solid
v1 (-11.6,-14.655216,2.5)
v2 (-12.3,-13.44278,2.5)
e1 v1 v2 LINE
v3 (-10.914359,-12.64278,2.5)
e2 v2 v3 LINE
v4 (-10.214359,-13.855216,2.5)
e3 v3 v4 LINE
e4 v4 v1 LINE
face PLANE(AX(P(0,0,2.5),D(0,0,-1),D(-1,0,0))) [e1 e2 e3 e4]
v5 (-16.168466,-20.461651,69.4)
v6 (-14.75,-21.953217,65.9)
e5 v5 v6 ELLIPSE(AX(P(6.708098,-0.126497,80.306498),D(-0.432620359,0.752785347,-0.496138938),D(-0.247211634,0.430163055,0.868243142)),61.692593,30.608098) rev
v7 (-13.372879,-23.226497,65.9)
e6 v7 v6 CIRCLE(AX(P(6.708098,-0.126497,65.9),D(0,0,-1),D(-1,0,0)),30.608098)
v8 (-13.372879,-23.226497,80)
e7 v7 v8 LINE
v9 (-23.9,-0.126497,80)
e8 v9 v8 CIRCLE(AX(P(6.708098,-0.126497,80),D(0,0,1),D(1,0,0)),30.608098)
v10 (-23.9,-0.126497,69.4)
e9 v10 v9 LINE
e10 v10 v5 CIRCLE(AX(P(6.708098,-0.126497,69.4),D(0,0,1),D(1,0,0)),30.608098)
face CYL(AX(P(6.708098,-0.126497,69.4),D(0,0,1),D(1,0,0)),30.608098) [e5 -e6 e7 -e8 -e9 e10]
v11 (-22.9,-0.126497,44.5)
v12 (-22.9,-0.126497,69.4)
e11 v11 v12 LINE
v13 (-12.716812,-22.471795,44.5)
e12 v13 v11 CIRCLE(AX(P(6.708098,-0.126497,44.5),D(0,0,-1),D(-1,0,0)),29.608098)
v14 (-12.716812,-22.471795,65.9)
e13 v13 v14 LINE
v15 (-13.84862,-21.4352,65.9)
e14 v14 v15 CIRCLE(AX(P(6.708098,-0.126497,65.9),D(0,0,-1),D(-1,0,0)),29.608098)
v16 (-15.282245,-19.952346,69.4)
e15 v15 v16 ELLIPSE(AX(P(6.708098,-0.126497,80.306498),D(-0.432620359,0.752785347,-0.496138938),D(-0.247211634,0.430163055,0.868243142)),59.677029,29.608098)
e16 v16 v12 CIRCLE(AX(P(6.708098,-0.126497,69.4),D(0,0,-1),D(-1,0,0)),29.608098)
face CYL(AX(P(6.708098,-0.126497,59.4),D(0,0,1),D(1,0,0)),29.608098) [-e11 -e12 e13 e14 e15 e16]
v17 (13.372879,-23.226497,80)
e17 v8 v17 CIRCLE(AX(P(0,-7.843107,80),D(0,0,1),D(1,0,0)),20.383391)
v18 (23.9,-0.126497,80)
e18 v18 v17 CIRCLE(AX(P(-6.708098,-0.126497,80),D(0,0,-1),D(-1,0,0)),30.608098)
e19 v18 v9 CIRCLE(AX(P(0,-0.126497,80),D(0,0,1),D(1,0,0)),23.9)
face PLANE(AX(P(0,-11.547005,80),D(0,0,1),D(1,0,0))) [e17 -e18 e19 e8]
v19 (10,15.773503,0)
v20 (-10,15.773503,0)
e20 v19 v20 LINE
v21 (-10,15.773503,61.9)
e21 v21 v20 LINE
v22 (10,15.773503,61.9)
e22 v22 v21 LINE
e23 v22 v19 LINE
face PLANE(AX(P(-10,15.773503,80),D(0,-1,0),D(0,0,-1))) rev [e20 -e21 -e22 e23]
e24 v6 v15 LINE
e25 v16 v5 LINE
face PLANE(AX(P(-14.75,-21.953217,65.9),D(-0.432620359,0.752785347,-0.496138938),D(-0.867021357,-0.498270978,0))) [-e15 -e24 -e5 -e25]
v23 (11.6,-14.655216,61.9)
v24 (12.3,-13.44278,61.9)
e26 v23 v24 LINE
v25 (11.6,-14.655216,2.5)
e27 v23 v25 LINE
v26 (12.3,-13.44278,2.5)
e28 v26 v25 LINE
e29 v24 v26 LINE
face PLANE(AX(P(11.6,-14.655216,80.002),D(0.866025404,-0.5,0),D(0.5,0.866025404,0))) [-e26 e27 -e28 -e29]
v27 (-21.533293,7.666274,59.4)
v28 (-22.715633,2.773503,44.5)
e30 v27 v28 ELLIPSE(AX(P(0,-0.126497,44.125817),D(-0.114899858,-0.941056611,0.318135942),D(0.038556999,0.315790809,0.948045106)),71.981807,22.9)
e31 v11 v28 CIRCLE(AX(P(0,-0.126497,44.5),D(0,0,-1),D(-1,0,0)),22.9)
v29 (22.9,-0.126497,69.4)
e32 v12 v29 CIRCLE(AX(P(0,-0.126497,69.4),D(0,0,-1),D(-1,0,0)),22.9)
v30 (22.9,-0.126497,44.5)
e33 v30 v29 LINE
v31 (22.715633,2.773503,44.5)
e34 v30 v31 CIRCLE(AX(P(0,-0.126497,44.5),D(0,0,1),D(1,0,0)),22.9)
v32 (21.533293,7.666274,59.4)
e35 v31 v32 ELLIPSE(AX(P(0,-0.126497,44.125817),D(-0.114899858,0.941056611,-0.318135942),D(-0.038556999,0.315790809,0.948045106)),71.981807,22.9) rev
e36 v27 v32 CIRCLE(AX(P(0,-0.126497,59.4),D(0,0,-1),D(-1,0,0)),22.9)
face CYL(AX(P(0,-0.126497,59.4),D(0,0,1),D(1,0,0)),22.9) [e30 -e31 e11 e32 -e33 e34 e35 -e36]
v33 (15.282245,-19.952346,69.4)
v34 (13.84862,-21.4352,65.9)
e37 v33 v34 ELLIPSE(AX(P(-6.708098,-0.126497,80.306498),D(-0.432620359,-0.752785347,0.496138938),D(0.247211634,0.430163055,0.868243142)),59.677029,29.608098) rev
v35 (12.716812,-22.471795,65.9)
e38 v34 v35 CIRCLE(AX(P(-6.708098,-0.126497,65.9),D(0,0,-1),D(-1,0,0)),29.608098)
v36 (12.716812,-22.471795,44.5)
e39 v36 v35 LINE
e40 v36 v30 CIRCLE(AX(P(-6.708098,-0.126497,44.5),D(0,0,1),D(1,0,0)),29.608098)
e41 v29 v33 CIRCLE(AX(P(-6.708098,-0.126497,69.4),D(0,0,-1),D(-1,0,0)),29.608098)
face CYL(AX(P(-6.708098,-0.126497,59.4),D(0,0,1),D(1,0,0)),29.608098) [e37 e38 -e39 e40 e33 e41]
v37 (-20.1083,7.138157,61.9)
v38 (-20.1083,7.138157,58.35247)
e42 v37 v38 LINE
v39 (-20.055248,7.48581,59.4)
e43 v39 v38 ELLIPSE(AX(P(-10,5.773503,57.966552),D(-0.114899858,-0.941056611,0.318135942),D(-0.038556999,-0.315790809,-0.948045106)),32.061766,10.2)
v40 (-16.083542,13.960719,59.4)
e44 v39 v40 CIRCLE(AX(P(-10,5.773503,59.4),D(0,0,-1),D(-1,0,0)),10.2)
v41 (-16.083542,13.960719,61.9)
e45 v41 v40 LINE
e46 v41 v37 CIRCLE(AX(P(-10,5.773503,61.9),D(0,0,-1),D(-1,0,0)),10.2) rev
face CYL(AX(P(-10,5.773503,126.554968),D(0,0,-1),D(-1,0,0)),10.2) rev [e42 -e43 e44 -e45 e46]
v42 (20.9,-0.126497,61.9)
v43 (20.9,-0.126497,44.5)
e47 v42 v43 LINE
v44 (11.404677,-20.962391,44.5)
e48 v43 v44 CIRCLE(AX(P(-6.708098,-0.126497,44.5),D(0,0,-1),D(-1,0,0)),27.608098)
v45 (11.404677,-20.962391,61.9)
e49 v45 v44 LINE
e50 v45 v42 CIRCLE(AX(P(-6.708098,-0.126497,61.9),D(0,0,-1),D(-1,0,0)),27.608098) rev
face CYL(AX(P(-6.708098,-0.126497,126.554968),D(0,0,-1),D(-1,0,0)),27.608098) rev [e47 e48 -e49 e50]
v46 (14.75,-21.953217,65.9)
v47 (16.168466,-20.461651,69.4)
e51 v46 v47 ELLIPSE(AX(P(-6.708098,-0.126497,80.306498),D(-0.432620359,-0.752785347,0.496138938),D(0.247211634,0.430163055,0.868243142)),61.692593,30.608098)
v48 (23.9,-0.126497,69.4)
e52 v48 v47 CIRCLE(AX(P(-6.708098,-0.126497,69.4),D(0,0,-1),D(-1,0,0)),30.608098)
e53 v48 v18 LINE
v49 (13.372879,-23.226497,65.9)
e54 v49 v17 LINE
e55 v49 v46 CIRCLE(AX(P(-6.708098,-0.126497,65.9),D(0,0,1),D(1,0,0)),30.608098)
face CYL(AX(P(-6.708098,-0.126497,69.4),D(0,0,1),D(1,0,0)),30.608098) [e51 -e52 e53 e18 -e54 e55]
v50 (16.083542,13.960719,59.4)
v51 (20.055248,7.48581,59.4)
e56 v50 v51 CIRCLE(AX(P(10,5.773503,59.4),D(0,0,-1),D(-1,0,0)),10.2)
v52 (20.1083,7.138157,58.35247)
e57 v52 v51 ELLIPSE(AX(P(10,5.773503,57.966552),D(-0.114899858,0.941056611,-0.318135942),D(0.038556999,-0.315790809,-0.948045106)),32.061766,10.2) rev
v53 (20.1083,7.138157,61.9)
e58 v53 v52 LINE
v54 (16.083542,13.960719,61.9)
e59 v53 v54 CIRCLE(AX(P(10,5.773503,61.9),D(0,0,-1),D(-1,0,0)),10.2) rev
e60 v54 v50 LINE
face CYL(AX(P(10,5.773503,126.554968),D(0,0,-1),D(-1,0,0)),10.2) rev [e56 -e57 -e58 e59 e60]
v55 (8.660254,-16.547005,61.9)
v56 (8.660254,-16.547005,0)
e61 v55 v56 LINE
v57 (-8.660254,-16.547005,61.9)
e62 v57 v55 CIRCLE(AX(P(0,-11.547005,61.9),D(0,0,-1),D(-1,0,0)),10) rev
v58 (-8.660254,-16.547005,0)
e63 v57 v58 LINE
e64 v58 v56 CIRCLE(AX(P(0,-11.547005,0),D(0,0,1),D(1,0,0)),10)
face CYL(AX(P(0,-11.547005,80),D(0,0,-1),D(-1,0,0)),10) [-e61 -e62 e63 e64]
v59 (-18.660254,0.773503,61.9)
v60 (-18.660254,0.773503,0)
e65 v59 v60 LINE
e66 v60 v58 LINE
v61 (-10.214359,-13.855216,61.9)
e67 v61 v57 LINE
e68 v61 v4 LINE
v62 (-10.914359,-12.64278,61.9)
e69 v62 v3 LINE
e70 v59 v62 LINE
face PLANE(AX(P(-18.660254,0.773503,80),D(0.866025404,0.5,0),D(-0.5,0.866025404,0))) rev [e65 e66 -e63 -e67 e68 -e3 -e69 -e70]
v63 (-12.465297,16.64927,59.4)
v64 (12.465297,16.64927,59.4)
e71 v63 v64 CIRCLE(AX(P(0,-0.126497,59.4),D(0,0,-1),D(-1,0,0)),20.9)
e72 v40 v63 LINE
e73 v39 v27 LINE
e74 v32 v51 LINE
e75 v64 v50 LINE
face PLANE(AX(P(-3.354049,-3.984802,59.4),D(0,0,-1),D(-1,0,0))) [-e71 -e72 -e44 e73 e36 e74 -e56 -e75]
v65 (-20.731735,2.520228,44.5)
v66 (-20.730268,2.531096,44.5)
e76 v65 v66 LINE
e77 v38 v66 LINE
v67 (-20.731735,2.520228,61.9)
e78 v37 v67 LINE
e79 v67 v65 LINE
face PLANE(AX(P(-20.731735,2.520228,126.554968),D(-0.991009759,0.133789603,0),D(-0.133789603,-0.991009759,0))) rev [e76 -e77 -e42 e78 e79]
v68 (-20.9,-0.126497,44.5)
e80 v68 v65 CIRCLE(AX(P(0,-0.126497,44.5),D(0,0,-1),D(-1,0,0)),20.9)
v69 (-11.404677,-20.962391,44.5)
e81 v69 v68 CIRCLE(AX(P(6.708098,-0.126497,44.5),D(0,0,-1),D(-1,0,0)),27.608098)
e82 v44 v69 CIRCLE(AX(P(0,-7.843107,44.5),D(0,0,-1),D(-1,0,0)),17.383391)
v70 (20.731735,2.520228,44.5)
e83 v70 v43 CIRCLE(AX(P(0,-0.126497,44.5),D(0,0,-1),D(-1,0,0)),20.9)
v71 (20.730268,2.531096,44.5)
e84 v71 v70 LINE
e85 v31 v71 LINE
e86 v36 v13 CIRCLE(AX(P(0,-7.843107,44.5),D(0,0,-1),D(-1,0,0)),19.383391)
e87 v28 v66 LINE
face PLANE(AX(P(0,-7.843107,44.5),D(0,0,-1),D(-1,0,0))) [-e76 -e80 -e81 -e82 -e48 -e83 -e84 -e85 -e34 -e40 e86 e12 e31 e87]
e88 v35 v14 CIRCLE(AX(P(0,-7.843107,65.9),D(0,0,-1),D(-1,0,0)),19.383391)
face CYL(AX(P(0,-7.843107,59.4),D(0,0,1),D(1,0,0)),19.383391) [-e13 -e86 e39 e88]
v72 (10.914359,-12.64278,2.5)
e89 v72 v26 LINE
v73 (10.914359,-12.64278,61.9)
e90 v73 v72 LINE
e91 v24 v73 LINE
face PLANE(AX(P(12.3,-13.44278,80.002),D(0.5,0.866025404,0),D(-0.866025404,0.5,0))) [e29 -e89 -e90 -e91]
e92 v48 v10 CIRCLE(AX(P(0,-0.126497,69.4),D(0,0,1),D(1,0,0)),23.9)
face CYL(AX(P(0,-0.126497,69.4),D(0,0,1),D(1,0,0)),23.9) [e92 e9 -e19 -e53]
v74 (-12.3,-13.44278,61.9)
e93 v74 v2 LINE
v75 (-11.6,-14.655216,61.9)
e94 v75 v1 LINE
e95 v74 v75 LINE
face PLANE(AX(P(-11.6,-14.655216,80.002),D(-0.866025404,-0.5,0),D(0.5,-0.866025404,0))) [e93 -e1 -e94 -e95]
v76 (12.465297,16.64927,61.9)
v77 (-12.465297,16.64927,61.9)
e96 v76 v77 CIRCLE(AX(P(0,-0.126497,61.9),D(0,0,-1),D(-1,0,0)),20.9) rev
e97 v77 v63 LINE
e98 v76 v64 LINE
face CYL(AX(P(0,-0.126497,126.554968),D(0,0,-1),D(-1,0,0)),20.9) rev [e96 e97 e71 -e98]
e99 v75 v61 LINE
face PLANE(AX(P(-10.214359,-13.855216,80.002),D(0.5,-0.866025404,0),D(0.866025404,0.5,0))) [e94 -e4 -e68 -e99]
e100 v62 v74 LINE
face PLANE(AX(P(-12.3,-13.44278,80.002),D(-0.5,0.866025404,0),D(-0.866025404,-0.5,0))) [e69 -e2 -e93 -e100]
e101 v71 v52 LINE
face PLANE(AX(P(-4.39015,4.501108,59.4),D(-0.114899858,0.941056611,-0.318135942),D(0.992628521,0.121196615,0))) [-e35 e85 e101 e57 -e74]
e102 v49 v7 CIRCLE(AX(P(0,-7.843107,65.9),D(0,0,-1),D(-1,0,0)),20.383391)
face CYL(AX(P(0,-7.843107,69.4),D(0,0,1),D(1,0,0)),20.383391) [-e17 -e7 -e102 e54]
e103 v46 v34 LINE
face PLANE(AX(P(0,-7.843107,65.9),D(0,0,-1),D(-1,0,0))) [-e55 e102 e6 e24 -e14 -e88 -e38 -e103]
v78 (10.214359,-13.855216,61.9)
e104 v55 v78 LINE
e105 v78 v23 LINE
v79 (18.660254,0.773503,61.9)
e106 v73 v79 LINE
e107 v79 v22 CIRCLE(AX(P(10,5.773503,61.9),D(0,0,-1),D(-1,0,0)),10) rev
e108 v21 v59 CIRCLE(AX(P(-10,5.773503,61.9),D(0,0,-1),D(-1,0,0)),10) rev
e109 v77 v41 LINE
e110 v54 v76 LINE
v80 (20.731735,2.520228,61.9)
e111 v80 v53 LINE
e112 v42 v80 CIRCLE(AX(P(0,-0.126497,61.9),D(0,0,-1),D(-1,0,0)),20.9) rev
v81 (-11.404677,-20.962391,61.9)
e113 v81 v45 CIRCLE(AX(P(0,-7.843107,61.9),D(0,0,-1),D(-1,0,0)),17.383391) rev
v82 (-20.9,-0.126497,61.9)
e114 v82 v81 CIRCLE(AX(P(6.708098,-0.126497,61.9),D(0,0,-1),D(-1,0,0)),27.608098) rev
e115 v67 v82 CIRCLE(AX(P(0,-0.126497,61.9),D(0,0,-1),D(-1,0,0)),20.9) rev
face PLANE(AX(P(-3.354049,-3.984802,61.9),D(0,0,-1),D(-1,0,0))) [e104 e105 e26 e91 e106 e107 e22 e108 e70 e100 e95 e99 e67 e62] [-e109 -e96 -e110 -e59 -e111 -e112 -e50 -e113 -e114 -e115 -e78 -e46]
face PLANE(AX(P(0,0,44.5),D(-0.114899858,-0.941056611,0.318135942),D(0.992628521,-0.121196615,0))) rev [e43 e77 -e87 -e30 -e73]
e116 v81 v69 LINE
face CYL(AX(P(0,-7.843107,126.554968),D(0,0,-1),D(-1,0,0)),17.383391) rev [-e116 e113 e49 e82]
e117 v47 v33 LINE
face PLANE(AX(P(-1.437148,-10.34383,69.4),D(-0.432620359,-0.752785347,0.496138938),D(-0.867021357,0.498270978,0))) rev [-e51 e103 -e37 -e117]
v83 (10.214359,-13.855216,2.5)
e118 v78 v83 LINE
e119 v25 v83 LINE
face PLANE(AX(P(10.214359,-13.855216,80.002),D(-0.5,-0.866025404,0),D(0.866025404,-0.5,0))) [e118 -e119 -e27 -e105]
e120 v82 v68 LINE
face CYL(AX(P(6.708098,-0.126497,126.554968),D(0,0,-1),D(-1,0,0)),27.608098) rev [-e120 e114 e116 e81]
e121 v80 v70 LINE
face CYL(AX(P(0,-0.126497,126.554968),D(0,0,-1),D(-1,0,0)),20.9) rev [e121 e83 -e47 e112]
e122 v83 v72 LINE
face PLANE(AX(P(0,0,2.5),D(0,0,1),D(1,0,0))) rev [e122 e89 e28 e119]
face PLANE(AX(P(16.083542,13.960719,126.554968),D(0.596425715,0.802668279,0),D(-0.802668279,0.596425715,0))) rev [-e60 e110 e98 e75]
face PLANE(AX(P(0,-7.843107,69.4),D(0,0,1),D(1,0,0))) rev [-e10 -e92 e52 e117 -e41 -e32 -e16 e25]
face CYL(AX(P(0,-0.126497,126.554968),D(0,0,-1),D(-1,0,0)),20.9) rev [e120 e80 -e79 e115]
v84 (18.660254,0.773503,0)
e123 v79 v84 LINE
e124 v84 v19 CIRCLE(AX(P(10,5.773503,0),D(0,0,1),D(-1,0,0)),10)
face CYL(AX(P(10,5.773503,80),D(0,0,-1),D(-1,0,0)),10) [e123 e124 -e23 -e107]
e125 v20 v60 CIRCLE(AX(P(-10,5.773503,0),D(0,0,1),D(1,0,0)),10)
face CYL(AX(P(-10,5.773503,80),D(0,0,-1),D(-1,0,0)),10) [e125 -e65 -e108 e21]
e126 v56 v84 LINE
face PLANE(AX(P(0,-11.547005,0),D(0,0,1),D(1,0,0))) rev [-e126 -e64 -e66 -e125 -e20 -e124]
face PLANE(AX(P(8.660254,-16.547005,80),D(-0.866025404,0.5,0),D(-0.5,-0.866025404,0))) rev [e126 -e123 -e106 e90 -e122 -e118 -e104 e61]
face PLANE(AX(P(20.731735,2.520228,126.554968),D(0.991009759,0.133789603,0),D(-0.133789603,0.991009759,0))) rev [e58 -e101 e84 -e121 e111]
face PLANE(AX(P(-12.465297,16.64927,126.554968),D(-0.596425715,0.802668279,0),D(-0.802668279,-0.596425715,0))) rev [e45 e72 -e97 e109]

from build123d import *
from OCP.BRepFilletAPI import BRepFilletAPI_MakeChamfer

# Parameters (mm, degrees)
BOSS_EXTRU_1_DEPTH      = 80
BOSS_EXTRU_2_DEPTH      = 10.6
BOSS_EXTRU_3_DEPTH      = 10
BOSS_EXTRU_4_DEPTH      = 3.5
CHANFREIN1_SIZE         = 2
CHANFREIN1_SIZE_2       = 3.5
BOSS_EXTRU_5_DEPTH      = 14.9
CHANFREIN2_SIZE         = 5
CHANFREIN2_SIZE_2       = 14.9
ENL_V_MAT_EXTRU_1_DEPTH = 61.9
BOSS_EXTRU_8_REACH      = 92.636
BOSS_EXTRU_8_START      = -2.5


with BuildPart() as part:
    # Esquisse1 → Boss.-Extru.1 (new body)
    with BuildSketch(Plane.XY):
        with BuildLine():
            Line((-9.999999999999973, 15.773502691896244), (9.999999999999973, 15.773502691896244))
            ThreePointArc((9.999999999999973, 15.773502691896244), (18.66025403784436, 10.773502691896228), (18.66025403784438, 0.7735026918962024))
            Line((18.66025403784438, 0.7735026918962024), (8.660254037844393, -16.54700538379251))
            ThreePointArc((8.660254037844393, -16.54700538379251), (-4.87e-15, -21.5470053837925), (-8.660254037844393, -16.54700538379251))
            Line((-8.660254037844393, -16.54700538379251), (-18.66025403784438, 0.7735026918962024))
            ThreePointArc((-18.66025403784438, 0.7735026918962024), (-18.66025403784441, 10.773502691896235), (-9.999999999999973, 15.773502691896244))
        make_face()
    extrude(amount=BOSS_EXTRU_1_DEPTH)

    # Esquisse2 → Boss.-Extru.2 (add)
    with BuildSketch(Plane.XY.offset(80)):
        with BuildLine():
            Line((0, 23.773502691896258), (0, -28.226497308103742))
            ThreePointArc((0, -28.226497308103742), (-7.138520611844601, -26.935621886911633), (-13.372879499304581, -23.22649730810374))
            ThreePointArc((-13.372879499304581, -23.22649730810374), (-21.14415675858487, -12.819312855059437), (-23.89999999999999, -0.12649730810374363))
            ThreePointArc((-23.89999999999999, -0.12649730810374363), (-16.89985207035848, 16.773354762254744), (0, 23.773502691896258))
        make_face()
    boss_extru_2 = extrude(amount=-BOSS_EXTRU_2_DEPTH)

    # Symétrie1: Boss.-Extru.2 across plane
    add(boss_extru_2.mirror(Plane(origin=(0, 0, 0), x_dir=(0, 0, 1), z_dir=(1, 0, 0))))

    # Esquisse4 → Boss.-Extru.3 (add)
    with BuildSketch(Plane(origin=(0, 0, 69.4), x_dir=(-1, 0, 0), z_dir=(0, 0, -1))):
        with BuildLine():
            ThreePointArc((-12.716812029717252, -22.471795065262707), (-2.04e-15, -27.226497308103735), (12.71681202971725, -22.4717950652627))
            ThreePointArc((12.71681202971725, -22.4717950652627), (20.2341931687673, -12.404624700892555), (22.899999999999995, -0.12649730810373652))
            ThreePointArc((22.899999999999995, -0.12649730810373652), (-6.91e-15, 22.773502691896258), (-22.899999999999995, -0.12649730810373735))
            ThreePointArc((-22.899999999999995, -0.12649730810373735), (-20.234193168767305, -12.404624700892553), (-12.716812029717252, -22.471795065262707))
        make_face()
    extrude(amount=BOSS_EXTRU_3_DEPTH)

    # Esquisse6 → Boss.-Extru.4 (add)
    with BuildSketch(Plane(origin=(0, 0, 69.4), x_dir=(-1, 0, 0), z_dir=(0, 0, -1))):
        with BuildLine():
            Line((14.75, -21.95321690393977), (0, -13.476497308103742))
            Line((0, -13.476497308103742), (0, -28.226497308103742))
            ThreePointArc((0, -28.226497308103742), (7.138520611844594, -26.935621886911633), (13.372879499304576, -23.226497308103735))
            ThreePointArc((13.372879499304576, -23.226497308103735), (14.071194795630928, -22.600407707254973), (14.75, -21.95321690393977))
        make_face()
    boss_extru_4 = extrude(amount=BOSS_EXTRU_4_DEPTH)

    # Symétrie2: Boss.-Extru.4 across plane
    add(boss_extru_4.mirror(Plane(origin=(0, 0, 0), x_dir=(0, 0, 1), z_dir=(1, 0, 0))))

    # Chanfrein1
    chanfrein1_edges_1 = [part.edges().sort_by_distance(p)[0] for p in [
        (-14.299309891443901, -21.69420851920438, 69.4),
    ]]
    chanfrein1_side_1 = [part.faces().sort_by_distance(p)[0] for p in [
        (-14.319240730556658, -21.659527664943543, 69.4),
    ]]
    chanfrein1_edges_2 = [part.edges().sort_by_distance(p)[0] for p in [
        (14.299309891443906, -21.694208519204384, 69.4),
    ]]
    chanfrein1_side_2 = [part.faces().sort_by_distance(p)[0] for p in [
        (14.319240730556663, -21.659527664943546, 69.4),
    ]]
    chanfrein1 = BRepFilletAPI_MakeChamfer(part.part.solid().wrapped)
    for e in chanfrein1_edges_1:
        chanfrein1.Add(CHANFREIN1_SIZE - 0.0001, CHANFREIN1_SIZE_2 - 0.0001, e.wrapped, chanfrein1_side_1[0].wrapped)
    for e in chanfrein1_edges_2:
        chanfrein1.Add(CHANFREIN1_SIZE - 0.0001, CHANFREIN1_SIZE_2 - 0.0001, e.wrapped, chanfrein1_side_2[0].wrapped)
    add(Compound.cast(chanfrein1.Shape()), mode=Mode.REPLACE)  # a hair under: the kernel refuses the full size

    # Esquisse7 → Boss.-Extru.5 (add)
    with BuildSketch(Plane(origin=(0, 0, 59.4), x_dir=(-1, 0, 0), z_dir=(0, 0, -1))):
        with BuildLine():
            Line((-6.79e-15, -27.22649730810374), (0, 0))
            Line((0, 0), (22.71563338320109, 2.7735026918962267))
            ThreePointArc((22.71563338320109, 2.7735026918962267), (22.853861867037974, 1.3264299999015228), (22.899999999999995, -0.12649730810374016))
            ThreePointArc((22.899999999999995, -0.12649730810374016), (20.2341931687673, -12.404624700892562), (12.716812029717245, -22.471795065262707))
            ThreePointArc((12.716812029717245, -22.471795065262707), (6.788307992740876, -25.998951656029643), (-6.79e-15, -27.22649730810374))
        make_face()
    boss_extru_5 = extrude(amount=BOSS_EXTRU_5_DEPTH)

    # Symétrie4: Boss.-Extru.5 across plane
    add(boss_extru_5.mirror(Plane(origin=(0, 0, 0), x_dir=(0, 0, 1), z_dir=(1, 0, 0))))

    # Chanfrein2
    chanfrein2_edges_1 = [part.edges().sort_by_distance(p)[0] for p in [
        (21.059128460282075, 2.5712489935136453, 59.4),
    ]]
    chanfrein2_side_1 = [part.faces().sort_by_distance(p)[0] for p in [
        (21.04700879877706, 2.6705118456034573, 59.4),
    ]]
    chanfrein2_edges_2 = [part.edges().sort_by_distance(p)[0] for p in [
        (-21.059128460282082, 2.571248993513646, 59.4),
    ]]
    chanfrein2_side_2 = [part.faces().sort_by_distance(p)[0] for p in [
        (-21.059128460282082, 2.571248993513646, 59.3),
    ]]
    chanfrein2 = BRepFilletAPI_MakeChamfer(part.part.solid().wrapped)
    for e in chanfrein2_edges_1:
        chanfrein2.Add(CHANFREIN2_SIZE - 0.0001, CHANFREIN2_SIZE_2 - 0.0001, e.wrapped, chanfrein2_side_1[0].wrapped)
    for e in chanfrein2_edges_2:
        chanfrein2.Add(CHANFREIN2_SIZE_2 - 0.0001, CHANFREIN2_SIZE - 0.0001, e.wrapped, chanfrein2_side_2[0].wrapped)
    add(Compound.cast(chanfrein2.Shape()), mode=Mode.REPLACE)  # a hair under: the kernel refuses the full size

    # Esquisse8 → Enlèv. mat.-Extru.1 (cut)
    with BuildSketch(Plane(origin=(0, 0, 0), x_dir=(-1, 0, 0), z_dir=(0, 0, -1))):
        with BuildLine():
            Line((-20.73173527113113, 2.5202275827259273), (-20.108299540895768, 7.138156637600371))
            ThreePointArc((-20.108299540895768, 7.138156637600371), (-18.785258977060302, 10.95609130242486), (-16.08354229758742, 13.96071913666333))
            Line((-16.08354229758742, 13.96071913666333), (-12.465297452899778, 16.64926972087978))
            ThreePointArc((-12.465297452899778, 16.64926972087978), (8.34e-15, 20.773502691896244), (12.465297452899788, 16.649269720879765))
            Line((12.465297452899788, 16.649269720879765), (16.083542297587456, 13.96071913666329))
            ThreePointArc((16.083542297587456, 13.96071913666329), (18.78525897706036, 10.956091302424788), (20.108299540895814, 7.13815663760026))
            Line((20.108299540895814, 7.13815663760026), (20.73173527113112, 2.5202275827259264))
            ThreePointArc((20.73173527113112, 2.5202275827259264), (20.857891398301028, 1.1995367852285772), (20.89999999999999, -0.12649730810373677))
            ThreePointArc((20.89999999999999, -0.12649730810373677), (18.414265989132176, -11.5752483925588), (11.404677090542576, -20.962390579580656))
            ThreePointArc((11.404677090542576, -20.962390579580656), (1.69e-15, -25.226497308103735), (-11.40467709054258, -20.962390579580664))
            ThreePointArc((-11.40467709054258, -20.962390579580664), (-18.414265989132176, -11.575248392558798), (-20.89999999999999, -0.1264973081037376))
            ThreePointArc((-20.89999999999999, -0.1264973081037376), (-20.85789139830103, 1.1995367852285768), (-20.73173527113113, 2.5202275827259273))
        make_face()
        with BuildLine():
            Line((-18.66025403784436, 0.773502691896218), (-8.660254037844393, -16.54700538379251))
            ThreePointArc((-8.660254037844393, -16.54700538379251), (6.09e-15, -21.547005383792524), (8.660254037844393, -16.54700538379251))
            Line((8.660254037844393, -16.54700538379251), (18.66025403784438, 0.7735026918962024))
            ThreePointArc((18.66025403784438, 0.7735026918962024), (18.66025403784438, 10.773502691896217), (9.999999999999973, 15.773502691896226))
            Line((9.999999999999973, 15.773502691896226), (-9.999999999999973, 15.773502691896244))
            ThreePointArc((-9.999999999999973, 15.773502691896244), (-18.660254037844357, 10.77350269189623), (-18.66025403784436, 0.773502691896218))
        make_face(mode=Mode.SUBTRACT)
    extrude(amount=-ENL_V_MAT_EXTRU_1_DEPTH, mode=Mode.SUBTRACT)

    # Esquisse9 → Boss.-Extru.8 (add, up to next)
    with BuildSketch(Plane(origin=(0, 0, 0), x_dir=(-1, 0, 0), z_dir=(0, 0, -1)).offset(BOSS_EXTRU_8_START), mode=Mode.PRIVATE) as boss_extru_8_sk1:
        Polygon((-10.214359353944898, -13.855216015993522), (-11.599999999999998, -14.655216015993522), (-12.3, -13.442780450695311), (-10.914359353944906, -12.642780450695314), align=None)
    boss_extru_8_tool1 = extrude(boss_extru_8_sk1.sketch, amount=-BOSS_EXTRU_8_REACH, mode=Mode.PRIVATE) - part.part
    # Esquisse9 → Boss.-Extru.8 (add, up to next)
    with BuildSketch(Plane(origin=(0, 0, 0), x_dir=(-1, 0, 0), z_dir=(0, 0, -1)).offset(BOSS_EXTRU_8_START), mode=Mode.PRIVATE) as boss_extru_8_sk2:
        Polygon((10.914359353944906, -12.642780450695314), (10.214359353944898, -13.855216015993522), (11.599999999999998, -14.655216015993522), (12.3, -13.442780450695311), align=None)
    boss_extru_8_tool2 = extrude(boss_extru_8_sk2.sketch, amount=-BOSS_EXTRU_8_REACH, mode=Mode.PRIVATE) - part.part
    add(boss_extru_8_tool1.solids().sort_by_distance((11.25718, -13.648998, 2.5))[0])
    add(boss_extru_8_tool2.solids().sort_by_distance((-11.25718, -13.648998, 2.5))[0])


solid = part.part
